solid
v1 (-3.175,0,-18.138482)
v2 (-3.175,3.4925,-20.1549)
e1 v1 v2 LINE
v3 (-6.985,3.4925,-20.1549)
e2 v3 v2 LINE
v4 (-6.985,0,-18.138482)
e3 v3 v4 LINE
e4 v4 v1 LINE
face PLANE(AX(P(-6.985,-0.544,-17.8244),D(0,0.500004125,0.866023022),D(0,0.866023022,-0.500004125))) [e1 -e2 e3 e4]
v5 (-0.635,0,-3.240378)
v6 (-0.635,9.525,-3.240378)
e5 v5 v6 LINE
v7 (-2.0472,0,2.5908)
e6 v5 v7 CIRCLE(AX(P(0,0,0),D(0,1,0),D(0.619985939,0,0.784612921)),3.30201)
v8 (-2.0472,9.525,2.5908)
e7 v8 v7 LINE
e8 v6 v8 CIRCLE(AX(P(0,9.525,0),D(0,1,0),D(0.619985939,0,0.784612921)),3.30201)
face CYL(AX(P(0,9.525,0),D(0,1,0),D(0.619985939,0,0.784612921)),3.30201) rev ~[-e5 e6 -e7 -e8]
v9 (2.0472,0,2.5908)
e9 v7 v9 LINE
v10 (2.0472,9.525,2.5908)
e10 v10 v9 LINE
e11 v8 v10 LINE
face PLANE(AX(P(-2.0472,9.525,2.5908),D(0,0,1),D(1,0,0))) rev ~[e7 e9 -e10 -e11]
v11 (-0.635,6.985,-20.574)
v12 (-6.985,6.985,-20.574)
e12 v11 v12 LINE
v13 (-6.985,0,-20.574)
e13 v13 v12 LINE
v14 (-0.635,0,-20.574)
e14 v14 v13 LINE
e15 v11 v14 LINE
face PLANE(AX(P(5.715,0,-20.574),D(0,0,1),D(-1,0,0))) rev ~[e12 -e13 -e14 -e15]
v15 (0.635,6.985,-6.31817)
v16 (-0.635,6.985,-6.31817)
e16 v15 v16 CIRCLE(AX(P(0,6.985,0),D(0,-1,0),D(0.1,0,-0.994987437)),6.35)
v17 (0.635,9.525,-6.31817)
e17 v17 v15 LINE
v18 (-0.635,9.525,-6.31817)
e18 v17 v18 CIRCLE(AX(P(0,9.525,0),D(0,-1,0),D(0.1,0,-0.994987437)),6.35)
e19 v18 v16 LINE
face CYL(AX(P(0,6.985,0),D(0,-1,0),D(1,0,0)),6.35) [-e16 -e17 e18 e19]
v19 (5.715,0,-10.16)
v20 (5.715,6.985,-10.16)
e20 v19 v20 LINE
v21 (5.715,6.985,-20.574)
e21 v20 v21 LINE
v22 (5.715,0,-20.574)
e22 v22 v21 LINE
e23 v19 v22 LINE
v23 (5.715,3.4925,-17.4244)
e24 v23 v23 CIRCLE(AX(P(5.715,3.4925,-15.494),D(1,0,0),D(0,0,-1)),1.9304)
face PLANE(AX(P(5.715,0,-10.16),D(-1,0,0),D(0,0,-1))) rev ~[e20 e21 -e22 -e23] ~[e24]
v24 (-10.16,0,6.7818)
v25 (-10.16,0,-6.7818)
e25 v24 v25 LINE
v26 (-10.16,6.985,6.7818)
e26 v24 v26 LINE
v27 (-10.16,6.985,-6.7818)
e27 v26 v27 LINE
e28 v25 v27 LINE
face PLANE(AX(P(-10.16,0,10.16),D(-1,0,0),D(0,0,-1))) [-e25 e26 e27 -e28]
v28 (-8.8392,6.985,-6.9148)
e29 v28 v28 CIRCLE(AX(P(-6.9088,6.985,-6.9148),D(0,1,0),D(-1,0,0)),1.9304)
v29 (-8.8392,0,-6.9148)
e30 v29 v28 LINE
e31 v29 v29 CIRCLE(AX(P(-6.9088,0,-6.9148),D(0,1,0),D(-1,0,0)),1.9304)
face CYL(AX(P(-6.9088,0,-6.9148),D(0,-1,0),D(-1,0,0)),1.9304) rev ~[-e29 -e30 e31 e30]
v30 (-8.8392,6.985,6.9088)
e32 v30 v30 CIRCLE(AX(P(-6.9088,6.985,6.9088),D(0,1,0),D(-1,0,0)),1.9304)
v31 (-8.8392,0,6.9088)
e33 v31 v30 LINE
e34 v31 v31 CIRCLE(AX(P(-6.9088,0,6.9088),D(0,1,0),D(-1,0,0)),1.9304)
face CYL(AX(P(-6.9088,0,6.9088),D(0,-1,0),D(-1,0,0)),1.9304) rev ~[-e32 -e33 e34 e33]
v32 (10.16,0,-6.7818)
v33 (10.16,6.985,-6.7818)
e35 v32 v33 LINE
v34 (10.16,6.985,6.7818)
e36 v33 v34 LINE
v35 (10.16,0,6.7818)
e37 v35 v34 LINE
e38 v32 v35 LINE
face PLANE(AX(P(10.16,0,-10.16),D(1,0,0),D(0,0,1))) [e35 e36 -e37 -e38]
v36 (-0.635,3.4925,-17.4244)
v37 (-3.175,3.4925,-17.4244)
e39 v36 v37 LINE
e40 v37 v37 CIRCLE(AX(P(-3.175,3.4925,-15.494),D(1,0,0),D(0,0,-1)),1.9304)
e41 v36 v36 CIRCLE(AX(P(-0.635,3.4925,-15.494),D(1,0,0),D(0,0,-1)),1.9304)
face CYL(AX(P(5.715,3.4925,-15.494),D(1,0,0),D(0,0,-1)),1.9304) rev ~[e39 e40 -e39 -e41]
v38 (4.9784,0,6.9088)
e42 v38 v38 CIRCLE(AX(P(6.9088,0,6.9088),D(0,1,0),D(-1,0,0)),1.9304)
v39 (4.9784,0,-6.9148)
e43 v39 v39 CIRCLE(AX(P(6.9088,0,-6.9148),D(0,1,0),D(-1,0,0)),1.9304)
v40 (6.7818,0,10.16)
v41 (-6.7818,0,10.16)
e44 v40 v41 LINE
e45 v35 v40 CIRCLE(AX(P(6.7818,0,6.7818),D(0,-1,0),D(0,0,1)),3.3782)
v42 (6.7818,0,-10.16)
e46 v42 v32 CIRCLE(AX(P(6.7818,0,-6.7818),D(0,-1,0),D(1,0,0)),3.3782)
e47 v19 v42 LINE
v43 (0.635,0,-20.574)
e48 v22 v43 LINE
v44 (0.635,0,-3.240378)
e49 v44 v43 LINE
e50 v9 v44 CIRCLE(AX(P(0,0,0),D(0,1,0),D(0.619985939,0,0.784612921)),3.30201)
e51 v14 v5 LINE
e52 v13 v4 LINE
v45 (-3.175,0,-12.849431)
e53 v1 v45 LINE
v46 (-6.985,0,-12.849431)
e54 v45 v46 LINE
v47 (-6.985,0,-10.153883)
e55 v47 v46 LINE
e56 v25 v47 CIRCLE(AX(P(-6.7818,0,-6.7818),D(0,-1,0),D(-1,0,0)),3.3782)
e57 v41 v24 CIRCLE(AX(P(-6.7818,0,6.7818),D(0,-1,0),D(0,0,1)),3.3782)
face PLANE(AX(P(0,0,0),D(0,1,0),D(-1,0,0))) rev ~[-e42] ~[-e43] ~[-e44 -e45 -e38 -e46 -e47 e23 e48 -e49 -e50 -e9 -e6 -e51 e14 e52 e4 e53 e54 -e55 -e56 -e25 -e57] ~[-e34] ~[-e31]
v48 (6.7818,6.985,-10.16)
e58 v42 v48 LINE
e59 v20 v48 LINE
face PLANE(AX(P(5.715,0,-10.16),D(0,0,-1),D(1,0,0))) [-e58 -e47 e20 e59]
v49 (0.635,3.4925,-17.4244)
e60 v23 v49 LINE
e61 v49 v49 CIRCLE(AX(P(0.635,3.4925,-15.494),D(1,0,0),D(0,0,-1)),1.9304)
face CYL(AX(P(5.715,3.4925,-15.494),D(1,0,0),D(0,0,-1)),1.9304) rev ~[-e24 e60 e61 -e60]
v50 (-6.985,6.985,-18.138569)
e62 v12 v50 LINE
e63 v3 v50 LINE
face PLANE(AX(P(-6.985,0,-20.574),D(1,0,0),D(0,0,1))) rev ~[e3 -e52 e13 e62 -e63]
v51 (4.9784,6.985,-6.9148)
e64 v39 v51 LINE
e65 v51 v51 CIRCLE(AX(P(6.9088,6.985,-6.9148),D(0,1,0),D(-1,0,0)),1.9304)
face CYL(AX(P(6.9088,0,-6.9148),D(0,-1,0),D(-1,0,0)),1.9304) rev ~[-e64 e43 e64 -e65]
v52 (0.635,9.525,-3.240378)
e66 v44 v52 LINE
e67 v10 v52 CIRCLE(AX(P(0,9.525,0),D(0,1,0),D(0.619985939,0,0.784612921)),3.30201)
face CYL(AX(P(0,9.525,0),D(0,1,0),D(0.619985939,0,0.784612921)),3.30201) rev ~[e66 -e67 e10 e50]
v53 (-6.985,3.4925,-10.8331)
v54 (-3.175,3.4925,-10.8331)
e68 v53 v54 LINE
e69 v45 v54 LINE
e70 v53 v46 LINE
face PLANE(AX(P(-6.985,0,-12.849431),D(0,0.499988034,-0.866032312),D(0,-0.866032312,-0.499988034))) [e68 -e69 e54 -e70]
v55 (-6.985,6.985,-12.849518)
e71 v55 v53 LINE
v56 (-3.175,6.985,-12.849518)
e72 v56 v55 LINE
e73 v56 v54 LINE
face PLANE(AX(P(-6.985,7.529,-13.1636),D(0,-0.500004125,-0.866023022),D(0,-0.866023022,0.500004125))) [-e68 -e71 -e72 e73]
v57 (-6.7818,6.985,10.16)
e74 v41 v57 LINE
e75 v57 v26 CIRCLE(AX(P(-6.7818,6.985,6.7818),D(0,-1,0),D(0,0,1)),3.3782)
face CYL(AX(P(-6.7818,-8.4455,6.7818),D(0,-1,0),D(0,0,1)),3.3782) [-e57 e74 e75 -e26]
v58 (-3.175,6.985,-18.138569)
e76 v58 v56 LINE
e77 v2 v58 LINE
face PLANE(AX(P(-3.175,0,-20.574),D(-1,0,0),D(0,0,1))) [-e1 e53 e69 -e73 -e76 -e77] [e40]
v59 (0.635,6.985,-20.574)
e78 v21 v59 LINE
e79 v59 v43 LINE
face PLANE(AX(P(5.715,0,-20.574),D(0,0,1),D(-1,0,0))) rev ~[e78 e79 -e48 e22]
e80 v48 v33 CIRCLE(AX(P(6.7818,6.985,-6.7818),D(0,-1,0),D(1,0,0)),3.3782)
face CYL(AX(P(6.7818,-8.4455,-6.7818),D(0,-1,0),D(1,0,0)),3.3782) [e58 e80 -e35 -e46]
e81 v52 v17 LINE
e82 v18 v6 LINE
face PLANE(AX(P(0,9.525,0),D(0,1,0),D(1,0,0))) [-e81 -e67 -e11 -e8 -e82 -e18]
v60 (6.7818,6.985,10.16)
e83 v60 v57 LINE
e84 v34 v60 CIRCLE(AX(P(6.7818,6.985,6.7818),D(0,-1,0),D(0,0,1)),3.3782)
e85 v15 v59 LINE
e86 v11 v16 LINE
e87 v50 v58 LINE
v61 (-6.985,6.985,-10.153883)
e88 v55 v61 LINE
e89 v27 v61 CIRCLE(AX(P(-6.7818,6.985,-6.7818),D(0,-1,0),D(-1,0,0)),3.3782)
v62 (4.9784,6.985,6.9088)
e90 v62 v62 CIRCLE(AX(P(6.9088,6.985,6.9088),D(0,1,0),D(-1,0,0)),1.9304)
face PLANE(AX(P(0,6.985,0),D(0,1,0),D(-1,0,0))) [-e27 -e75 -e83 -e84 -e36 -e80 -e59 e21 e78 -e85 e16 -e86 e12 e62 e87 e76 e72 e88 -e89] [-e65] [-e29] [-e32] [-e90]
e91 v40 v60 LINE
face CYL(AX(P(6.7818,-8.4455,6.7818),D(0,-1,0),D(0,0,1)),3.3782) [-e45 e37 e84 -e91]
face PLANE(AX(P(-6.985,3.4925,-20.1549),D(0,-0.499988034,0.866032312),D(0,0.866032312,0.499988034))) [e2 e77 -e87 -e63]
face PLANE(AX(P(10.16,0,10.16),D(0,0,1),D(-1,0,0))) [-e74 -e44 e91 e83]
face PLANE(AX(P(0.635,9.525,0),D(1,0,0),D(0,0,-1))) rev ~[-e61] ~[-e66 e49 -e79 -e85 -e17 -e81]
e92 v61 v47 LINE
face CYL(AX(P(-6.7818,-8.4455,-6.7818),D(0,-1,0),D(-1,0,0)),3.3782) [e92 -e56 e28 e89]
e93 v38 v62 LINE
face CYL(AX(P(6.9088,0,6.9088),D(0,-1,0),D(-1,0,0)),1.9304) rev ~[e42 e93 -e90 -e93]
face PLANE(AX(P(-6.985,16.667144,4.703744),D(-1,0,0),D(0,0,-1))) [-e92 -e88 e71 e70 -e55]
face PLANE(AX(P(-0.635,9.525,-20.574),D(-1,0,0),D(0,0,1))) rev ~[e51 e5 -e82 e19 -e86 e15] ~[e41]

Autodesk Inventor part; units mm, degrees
ref_plane "YZ Plane" through (0, 0, 0) normal (1, 0, 0) x (0, 1, 0)
ref_plane "XZ Plane" through (0, 0, 0) normal (0, 1, 0) x (-1, 0, 0)
ref_plane "XY Plane" through (0, 0, 0) normal (0, 0, 1) x (1, 0, 0)
sketch "Sketch1" plane through (0, 0, 0) normal (0, 1, 0) x (-1, 0, 0)
  line L0 (-10.16, 10.16) -> (10.16, 10.16)
  line L1 (10.16, 10.16) -> (10.16, -10.16)
  line L2 (-10.16, -10.16) -> (-10.16, 10.16)
  circle A0 centre (6.9088, -6.9148) radius 1.9304
  circle A1 centre (6.9088, 6.9088) radius 1.9304
  circle A2 centre (-6.9088, 6.9088) radius 1.9304
  circle A3 centre (-6.9088, -6.9148) radius 1.9304
  line L3 (-5.715, -10.16) -> (-5.715, -20.574)
  line L4 (-5.715, -20.574) -> (6.985, -20.574)
  line L5 (6.985, -20.574) -> (6.985, -10.16)
  line L6 (10.16, -10.16) -> (6.985, -10.16)
  line L7 (-5.715, -10.16) -> (-10.16, -10.16)
  point P0 (0, 0)
  dimension "d0" = 20.32
  dimension "d2" = 10.16
  dimension "d3" = 10.16
  dimension "d4" = 3.8608
  dimension "d5" = 6.9148
  dimension "d6" = 6.9088
  dimension "d7" = 3.8608
  dimension "d8" = 6.9088
  dimension "d9" = 6.9088
  dimension "d10" = 3.8608
  dimension "d11" = 6.9088
  dimension "d12" = 6.9088
  dimension "d13" = 3.8608
  dimension "d14" = 12.7
  dimension "d16" = 6.985
extrude "Extrusion1" add sketch "Sketch1" along normal blind 6.985
sketch "Sketch2" plane through (-6.985, 0, -20.574) normal (-1, 0, 0) x (0, 0, 1)
  circle A0 centre (5.08, 3.4925) radius 4.6609 construction
  line L0 (10.414, 0) -> (0, 0) projected
  line L1 (0, 0) -> (0, 6.985) projected
  line L2 (9.7409, 3.4925) -> (7.4105, -0.544)
  line L3 (7.4105, -0.544) -> (2.7496, -0.544)
  line L4 (2.7496, -0.544) -> (0.4191, 3.4925)
  line L5 (0.4191, 3.4925) -> (2.7495, 7.529)
  line L6 (2.7495, 7.529) -> (7.4104, 7.529)
  line L7 (7.4104, 7.529) -> (9.7409, 3.4925)
  point P0 (20.574, 0)
  dimension "d19" = 9.3218
  dimension "d20" = 3.4925
  dimension "d21" = 5.08
extrude "Extrusion2" cut sketch "Sketch2" against normal blind 3.81
sketch "Sketch3" plane through (5.715, 0, -10.16) normal (1, 0, 0) x (0, 0, -1)
  circle A0 centre (5.334, 3.4925) radius 1.9304
  line L0 (10.414, 0) -> (10.414, 6.985) projected
  line L1 (0, 6.985) -> (10.414, 6.985) projected
  point P0 (-10.16, 0)
  dimension "d24" = 3.8608
  dimension "d25" = 5.08
  dimension "d26" = 3.4925
extrude "Extrusion3" cut sketch "Sketch3" against normal through all
sketch "Sketch4" plane through (0, 6.985, 0) normal (0, 1, 0) x (1, 0, 0)
  circle A0 centre (0, 0) radius 6.35
  dimension "d29" = 12.7
extrude "Extrusion4" add sketch "Sketch4" along normal blind 2.54
sketch "Sketch5" plane through (0, 9.525, 0) normal (0, 1, 0) x (1, 0, 0)
  arc A0 (2.0472, -2.5908) -> (-2.0472, -2.5908) centre (0, 0) ccw
  line L0 (-2.0472, -2.5908) -> (2.0472, -2.5908)
  dimension "d32" = 6.604
  dimension "d33" = 2.5908
fillet "Fillet1" radius 3.3782 4 edges at (10.16, 3.4925, 10.16) (10.16, 3.4925, -10.16) (-10.16, 3.4925, 10.16) (-10.16, 3.4925, -10.16)
extrude "Extrusion5" cut sketch "Sketch5" against normal through all
sketch "Sketch6" plane through (0, 9.525, 0) normal (0, 1, 0) x (1, 0, 0)
  line L0 (-6.985, 20.574) -> (5.715, 20.574) projected
  line L1 (0.635, 0) -> (0.635, 20.574)
  line L2 (0.635, 20.574) -> (-0.635, 20.574)
  line L3 (-0.635, 20.574) -> (-0.635, 0)
  line L4 (-0.635, -20.574) -> (0.635, 20.574) construction
  line L5 (0.635, -20.574) -> (-0.635, 20.574) construction
  line L6 (-0.635, 0) -> (0.635, 0)
  point P0 (0, 0)
  dimension "d37" = 1.27
extrude "Extrusion6" cut sketch "Sketch6" against normal through all
sketch "Sketch7" plane through (0, 0, 0) normal (0, -1, 0) x (1, 0, 0)
  circle A0 centre (-6.9088, 6.9088) radius 1.9304 construction
  circle A1 centre (-6.9088, 6.9088) radius 4.6609 construction
  point P0 (0, 0)
  dimension "d40" = 9.3218
properties part number "clamping hub 1_4 D b"
